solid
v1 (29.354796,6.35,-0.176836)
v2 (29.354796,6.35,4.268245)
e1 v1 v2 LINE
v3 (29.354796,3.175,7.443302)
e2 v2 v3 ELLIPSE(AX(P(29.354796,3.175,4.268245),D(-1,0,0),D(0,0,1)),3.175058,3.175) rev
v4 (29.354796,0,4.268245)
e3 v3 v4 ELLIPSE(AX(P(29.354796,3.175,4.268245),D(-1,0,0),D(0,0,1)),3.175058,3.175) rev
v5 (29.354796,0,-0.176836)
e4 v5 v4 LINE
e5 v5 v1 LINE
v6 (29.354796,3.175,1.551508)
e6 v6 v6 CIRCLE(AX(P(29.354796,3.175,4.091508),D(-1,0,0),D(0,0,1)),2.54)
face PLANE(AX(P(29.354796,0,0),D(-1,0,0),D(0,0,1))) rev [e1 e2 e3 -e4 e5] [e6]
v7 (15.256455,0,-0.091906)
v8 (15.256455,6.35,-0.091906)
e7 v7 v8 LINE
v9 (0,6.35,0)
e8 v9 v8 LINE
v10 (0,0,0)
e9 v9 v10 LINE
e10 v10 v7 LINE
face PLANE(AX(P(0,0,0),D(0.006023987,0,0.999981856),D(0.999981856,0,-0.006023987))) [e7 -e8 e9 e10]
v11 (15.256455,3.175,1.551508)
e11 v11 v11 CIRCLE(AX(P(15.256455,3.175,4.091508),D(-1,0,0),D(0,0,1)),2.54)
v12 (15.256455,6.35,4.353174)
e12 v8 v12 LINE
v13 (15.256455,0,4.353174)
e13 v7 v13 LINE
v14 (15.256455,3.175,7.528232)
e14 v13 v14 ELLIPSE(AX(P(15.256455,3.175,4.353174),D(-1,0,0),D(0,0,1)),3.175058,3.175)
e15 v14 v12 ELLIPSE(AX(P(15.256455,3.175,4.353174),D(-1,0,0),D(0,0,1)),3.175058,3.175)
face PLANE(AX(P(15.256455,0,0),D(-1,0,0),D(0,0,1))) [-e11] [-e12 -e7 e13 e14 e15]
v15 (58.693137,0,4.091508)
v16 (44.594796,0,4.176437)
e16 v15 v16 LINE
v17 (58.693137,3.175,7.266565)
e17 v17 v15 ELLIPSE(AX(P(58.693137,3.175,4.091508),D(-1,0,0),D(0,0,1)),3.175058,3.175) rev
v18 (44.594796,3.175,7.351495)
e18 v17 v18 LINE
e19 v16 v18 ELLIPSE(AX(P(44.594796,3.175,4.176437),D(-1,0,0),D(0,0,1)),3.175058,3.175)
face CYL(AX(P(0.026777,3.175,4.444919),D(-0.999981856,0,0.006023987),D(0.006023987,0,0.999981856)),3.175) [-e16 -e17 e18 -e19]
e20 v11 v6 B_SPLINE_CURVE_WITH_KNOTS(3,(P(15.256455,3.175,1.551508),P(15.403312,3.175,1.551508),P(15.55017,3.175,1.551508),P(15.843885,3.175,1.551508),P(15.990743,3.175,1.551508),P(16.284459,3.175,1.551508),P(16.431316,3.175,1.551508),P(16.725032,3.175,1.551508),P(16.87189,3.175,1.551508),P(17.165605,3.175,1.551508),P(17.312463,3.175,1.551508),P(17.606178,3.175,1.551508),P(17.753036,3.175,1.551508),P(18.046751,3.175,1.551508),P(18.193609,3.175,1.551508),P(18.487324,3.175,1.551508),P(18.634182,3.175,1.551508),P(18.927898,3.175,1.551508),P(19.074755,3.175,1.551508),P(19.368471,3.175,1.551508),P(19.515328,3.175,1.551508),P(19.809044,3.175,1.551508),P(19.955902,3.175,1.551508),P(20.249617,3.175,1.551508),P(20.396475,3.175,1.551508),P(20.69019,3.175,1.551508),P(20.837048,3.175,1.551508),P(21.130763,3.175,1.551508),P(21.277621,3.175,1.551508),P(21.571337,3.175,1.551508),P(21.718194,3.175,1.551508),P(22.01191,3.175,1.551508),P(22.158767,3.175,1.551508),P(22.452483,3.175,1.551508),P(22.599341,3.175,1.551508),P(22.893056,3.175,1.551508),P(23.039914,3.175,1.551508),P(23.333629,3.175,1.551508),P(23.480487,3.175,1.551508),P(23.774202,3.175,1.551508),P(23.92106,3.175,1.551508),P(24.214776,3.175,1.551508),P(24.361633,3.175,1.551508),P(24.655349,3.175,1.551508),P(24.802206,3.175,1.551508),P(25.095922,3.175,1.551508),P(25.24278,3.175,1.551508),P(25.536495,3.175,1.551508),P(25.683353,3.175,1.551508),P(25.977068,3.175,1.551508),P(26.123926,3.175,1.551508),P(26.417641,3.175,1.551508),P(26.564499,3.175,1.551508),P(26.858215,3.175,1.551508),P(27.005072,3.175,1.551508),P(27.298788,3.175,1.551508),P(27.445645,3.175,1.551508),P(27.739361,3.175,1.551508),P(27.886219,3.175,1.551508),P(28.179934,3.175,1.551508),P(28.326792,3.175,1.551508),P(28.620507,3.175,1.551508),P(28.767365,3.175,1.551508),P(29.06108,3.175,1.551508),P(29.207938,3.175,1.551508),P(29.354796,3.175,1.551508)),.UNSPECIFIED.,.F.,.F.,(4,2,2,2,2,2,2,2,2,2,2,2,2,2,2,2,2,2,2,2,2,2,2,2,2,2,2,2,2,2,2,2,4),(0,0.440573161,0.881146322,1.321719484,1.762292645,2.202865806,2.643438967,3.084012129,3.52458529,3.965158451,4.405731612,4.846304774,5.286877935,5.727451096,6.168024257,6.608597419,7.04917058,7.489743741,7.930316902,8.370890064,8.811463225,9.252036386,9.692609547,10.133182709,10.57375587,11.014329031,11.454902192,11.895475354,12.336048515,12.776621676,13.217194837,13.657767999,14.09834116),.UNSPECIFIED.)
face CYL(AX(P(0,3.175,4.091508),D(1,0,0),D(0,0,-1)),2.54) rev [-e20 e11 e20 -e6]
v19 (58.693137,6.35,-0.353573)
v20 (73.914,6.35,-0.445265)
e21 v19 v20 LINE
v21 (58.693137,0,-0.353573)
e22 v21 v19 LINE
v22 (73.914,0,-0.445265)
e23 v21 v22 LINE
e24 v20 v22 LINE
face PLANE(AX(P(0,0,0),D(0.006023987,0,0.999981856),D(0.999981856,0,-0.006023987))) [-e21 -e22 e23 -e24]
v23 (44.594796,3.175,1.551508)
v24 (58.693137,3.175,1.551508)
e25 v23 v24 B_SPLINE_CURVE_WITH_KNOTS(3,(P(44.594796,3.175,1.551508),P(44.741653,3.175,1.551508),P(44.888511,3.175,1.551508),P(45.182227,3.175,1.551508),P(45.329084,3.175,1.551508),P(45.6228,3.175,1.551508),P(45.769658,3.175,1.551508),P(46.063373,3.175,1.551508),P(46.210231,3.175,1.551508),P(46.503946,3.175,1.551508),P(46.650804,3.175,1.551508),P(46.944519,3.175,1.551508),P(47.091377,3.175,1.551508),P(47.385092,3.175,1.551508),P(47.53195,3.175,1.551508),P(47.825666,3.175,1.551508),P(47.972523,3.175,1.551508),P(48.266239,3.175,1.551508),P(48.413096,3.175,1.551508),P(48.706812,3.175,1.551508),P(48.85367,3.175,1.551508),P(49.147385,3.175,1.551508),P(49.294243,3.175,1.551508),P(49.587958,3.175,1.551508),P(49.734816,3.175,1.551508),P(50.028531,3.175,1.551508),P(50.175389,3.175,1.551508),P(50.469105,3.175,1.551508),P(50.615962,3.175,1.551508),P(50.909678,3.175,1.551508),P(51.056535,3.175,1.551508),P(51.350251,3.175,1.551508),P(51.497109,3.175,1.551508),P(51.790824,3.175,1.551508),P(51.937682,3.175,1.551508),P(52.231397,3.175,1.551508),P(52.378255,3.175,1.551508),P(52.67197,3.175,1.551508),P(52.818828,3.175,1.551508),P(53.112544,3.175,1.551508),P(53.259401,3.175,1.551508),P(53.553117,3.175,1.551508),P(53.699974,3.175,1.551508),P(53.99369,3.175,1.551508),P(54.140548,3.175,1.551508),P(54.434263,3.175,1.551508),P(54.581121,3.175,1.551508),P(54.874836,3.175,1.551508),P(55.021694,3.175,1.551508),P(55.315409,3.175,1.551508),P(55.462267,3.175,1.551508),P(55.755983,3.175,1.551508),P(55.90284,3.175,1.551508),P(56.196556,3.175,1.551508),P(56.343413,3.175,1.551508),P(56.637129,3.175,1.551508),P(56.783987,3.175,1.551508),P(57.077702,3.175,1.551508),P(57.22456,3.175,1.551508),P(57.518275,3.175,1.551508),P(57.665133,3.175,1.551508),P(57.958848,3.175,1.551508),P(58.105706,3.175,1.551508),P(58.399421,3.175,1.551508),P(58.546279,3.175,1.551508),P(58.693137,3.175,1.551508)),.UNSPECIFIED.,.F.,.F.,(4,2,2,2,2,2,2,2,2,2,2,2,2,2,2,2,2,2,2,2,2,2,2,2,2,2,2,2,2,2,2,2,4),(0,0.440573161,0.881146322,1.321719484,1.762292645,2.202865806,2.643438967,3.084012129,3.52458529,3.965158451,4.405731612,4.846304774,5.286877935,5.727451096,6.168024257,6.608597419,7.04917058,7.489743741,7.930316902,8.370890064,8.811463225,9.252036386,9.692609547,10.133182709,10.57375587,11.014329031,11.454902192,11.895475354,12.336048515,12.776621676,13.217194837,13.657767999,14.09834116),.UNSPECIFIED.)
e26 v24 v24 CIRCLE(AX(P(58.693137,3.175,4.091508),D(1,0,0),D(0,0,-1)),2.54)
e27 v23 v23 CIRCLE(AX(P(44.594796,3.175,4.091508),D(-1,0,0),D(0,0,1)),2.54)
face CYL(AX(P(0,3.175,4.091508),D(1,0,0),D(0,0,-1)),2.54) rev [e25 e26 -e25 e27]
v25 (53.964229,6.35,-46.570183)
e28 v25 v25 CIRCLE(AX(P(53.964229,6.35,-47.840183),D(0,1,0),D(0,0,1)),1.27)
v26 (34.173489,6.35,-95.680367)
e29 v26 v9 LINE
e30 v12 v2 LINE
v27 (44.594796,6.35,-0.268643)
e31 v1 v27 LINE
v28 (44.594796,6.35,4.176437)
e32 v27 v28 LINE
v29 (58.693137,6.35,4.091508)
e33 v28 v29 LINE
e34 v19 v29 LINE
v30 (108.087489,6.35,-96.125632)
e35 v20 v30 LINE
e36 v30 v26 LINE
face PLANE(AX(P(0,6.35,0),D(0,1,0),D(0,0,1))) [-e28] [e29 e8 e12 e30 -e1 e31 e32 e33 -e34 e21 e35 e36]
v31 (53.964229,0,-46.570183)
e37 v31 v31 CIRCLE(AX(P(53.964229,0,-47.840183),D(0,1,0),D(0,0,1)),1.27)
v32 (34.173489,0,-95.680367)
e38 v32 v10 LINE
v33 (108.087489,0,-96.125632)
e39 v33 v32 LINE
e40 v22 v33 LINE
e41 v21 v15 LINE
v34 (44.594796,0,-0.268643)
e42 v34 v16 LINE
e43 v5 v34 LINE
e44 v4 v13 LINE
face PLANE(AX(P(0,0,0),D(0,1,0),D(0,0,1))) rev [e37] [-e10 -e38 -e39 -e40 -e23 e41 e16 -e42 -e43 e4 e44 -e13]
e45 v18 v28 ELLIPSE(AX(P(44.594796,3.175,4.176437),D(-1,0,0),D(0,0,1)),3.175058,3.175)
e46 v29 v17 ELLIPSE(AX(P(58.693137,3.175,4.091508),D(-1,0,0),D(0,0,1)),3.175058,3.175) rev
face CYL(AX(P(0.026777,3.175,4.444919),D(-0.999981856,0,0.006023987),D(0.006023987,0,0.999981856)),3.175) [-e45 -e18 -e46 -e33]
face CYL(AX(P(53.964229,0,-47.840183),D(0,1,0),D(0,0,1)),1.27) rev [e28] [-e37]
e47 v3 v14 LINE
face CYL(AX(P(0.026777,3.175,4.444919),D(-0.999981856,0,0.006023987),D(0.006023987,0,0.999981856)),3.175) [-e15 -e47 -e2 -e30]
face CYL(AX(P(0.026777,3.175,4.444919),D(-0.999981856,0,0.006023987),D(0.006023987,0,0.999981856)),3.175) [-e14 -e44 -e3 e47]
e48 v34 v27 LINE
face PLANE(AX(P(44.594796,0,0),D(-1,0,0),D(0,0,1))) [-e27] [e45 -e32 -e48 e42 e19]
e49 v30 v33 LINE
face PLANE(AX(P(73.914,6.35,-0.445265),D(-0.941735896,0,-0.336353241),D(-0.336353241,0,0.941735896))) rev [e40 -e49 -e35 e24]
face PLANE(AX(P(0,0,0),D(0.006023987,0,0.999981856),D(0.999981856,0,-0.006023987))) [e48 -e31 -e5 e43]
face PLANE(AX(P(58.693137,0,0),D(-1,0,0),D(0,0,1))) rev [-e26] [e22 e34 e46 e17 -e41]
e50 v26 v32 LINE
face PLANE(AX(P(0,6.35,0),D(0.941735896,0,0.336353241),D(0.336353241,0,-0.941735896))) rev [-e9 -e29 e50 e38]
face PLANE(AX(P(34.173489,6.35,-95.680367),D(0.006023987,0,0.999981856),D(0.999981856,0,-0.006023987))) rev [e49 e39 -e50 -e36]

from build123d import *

# Parameters (mm, degrees)
BOSS_EXTRUDE1_DEPTH = 6.35
CUT_EXTRUDE1_DEPTH  = 145.787309477
SKETCH3_W           = 73.915341148
SKETCH3_H           = 6.35
BOSS_EXTRUDE2_DEPTH = 7.62
CUT_EXTRUDE2_DEPTH  = 145.787309477
FILLET1_R           = 3.175
SKETCH5_R           = 2.54
CUT_EXTRUDE3_DEPTH  = 113.806666284


with BuildPart() as part:
    # Sketch1 → Boss-Extrude1 (new body)
    with BuildSketch(Plane(origin=(0, 0, 0), x_dir=(1, 0, 0), z_dir=(0, 1, 0))):
        Polygon((0, 0), (34.173489324, 95.680366991), (108.087489324, 96.125632051), (73.914, 0.44526506), align=None)
    extrude(amount=BOSS_EXTRUDE1_DEPTH)

    # Sketch2 → Cut-Extrude1 (cut, through all)
    with BuildSketch(Plane(origin=(0, 6.35, 0), x_dir=(1, 0, 0), z_dir=(0, 1, 0))):
        with BuildLine():
            ThreePointArc((55.234228554, 47.840183495), (53.964228554, 49.110183495), (52.694228554, 47.840183495))
            Line((52.694228554, 47.840183495), (55.234228554, 47.840183495))
        make_face()
        with BuildLine():
            Line((55.234228554, 47.840183495), (52.694228554, 47.840183495))
            ThreePointArc((52.694228554, 47.840183495), (53.964228554, 46.570183495), (55.234228554, 47.840183495))
        make_face()
    extrude(amount=-CUT_EXTRUDE1_DEPTH, mode=Mode.SUBTRACT)

    # Sketch3 → Boss-Extrude2 (add)
    with BuildSketch(Plane(origin=(0, 0, 0), x_dir=(0.9999818556252084, 0, -0.00602398708207968), z_dir=(0.00602398708207968, 0, 0.9999818556252085))):
        with Locations((36.957670574, 3.175)):
            Rectangle(SKETCH3_W, SKETCH3_H)
    extrude(amount=BOSS_EXTRUDE2_DEPTH)

    # Sketch4 → Cut-Extrude2 (cut, through all)
    with BuildSketch(Plane(origin=(0, 6.35, 0), x_dir=(1, 0, 0), z_dir=(0, 1, 0))):
        Polygon((15.256454596, 0.091906353), (0, 0), (0.045902782, -7.61986174), (15.256454596, -7.52823191), align=None)
        Polygon((44.594795755, 0.268643348), (29.354795755, 0.176836119), (29.354795755, -7.443302144), (44.594795755, -7.351494915), align=None)
        Polygon((73.914, 0.44526506), (58.693136915, 0.353573114), (58.693136915, -7.266565149), (73.959902782, -7.17459668), align=None)
    extrude(amount=-CUT_EXTRUDE2_DEPTH, mode=Mode.SUBTRACT)

    # Fillet1
    fillet1_edges = [part.edges().sort_by_distance(p)[0] for p in [
        (51.643966335, 0, 7.309030032),
        (51.643966335, 6.35, 7.309030032),
        (22.305625176, 0, 7.485767027),
        (22.305625176, 6.35, 7.485767027),
    ]]
    fillet(fillet1_edges, radius=FILLET1_R - 0.0001)  # a hair under: the kernel refuses the full size

    # Sketch5 → Cut-Extrude3 (cut, through all)
    with BuildSketch(Plane(origin=(58.693136915, 0, 0), x_dir=(0, 0, -1), z_dir=(1, 0, 0))):
        with Locations((-4.091507539, 3.175)):
            Circle(SKETCH5_R)
    extrude(amount=-CUT_EXTRUDE3_DEPTH, mode=Mode.SUBTRACT)


solid = part.part
